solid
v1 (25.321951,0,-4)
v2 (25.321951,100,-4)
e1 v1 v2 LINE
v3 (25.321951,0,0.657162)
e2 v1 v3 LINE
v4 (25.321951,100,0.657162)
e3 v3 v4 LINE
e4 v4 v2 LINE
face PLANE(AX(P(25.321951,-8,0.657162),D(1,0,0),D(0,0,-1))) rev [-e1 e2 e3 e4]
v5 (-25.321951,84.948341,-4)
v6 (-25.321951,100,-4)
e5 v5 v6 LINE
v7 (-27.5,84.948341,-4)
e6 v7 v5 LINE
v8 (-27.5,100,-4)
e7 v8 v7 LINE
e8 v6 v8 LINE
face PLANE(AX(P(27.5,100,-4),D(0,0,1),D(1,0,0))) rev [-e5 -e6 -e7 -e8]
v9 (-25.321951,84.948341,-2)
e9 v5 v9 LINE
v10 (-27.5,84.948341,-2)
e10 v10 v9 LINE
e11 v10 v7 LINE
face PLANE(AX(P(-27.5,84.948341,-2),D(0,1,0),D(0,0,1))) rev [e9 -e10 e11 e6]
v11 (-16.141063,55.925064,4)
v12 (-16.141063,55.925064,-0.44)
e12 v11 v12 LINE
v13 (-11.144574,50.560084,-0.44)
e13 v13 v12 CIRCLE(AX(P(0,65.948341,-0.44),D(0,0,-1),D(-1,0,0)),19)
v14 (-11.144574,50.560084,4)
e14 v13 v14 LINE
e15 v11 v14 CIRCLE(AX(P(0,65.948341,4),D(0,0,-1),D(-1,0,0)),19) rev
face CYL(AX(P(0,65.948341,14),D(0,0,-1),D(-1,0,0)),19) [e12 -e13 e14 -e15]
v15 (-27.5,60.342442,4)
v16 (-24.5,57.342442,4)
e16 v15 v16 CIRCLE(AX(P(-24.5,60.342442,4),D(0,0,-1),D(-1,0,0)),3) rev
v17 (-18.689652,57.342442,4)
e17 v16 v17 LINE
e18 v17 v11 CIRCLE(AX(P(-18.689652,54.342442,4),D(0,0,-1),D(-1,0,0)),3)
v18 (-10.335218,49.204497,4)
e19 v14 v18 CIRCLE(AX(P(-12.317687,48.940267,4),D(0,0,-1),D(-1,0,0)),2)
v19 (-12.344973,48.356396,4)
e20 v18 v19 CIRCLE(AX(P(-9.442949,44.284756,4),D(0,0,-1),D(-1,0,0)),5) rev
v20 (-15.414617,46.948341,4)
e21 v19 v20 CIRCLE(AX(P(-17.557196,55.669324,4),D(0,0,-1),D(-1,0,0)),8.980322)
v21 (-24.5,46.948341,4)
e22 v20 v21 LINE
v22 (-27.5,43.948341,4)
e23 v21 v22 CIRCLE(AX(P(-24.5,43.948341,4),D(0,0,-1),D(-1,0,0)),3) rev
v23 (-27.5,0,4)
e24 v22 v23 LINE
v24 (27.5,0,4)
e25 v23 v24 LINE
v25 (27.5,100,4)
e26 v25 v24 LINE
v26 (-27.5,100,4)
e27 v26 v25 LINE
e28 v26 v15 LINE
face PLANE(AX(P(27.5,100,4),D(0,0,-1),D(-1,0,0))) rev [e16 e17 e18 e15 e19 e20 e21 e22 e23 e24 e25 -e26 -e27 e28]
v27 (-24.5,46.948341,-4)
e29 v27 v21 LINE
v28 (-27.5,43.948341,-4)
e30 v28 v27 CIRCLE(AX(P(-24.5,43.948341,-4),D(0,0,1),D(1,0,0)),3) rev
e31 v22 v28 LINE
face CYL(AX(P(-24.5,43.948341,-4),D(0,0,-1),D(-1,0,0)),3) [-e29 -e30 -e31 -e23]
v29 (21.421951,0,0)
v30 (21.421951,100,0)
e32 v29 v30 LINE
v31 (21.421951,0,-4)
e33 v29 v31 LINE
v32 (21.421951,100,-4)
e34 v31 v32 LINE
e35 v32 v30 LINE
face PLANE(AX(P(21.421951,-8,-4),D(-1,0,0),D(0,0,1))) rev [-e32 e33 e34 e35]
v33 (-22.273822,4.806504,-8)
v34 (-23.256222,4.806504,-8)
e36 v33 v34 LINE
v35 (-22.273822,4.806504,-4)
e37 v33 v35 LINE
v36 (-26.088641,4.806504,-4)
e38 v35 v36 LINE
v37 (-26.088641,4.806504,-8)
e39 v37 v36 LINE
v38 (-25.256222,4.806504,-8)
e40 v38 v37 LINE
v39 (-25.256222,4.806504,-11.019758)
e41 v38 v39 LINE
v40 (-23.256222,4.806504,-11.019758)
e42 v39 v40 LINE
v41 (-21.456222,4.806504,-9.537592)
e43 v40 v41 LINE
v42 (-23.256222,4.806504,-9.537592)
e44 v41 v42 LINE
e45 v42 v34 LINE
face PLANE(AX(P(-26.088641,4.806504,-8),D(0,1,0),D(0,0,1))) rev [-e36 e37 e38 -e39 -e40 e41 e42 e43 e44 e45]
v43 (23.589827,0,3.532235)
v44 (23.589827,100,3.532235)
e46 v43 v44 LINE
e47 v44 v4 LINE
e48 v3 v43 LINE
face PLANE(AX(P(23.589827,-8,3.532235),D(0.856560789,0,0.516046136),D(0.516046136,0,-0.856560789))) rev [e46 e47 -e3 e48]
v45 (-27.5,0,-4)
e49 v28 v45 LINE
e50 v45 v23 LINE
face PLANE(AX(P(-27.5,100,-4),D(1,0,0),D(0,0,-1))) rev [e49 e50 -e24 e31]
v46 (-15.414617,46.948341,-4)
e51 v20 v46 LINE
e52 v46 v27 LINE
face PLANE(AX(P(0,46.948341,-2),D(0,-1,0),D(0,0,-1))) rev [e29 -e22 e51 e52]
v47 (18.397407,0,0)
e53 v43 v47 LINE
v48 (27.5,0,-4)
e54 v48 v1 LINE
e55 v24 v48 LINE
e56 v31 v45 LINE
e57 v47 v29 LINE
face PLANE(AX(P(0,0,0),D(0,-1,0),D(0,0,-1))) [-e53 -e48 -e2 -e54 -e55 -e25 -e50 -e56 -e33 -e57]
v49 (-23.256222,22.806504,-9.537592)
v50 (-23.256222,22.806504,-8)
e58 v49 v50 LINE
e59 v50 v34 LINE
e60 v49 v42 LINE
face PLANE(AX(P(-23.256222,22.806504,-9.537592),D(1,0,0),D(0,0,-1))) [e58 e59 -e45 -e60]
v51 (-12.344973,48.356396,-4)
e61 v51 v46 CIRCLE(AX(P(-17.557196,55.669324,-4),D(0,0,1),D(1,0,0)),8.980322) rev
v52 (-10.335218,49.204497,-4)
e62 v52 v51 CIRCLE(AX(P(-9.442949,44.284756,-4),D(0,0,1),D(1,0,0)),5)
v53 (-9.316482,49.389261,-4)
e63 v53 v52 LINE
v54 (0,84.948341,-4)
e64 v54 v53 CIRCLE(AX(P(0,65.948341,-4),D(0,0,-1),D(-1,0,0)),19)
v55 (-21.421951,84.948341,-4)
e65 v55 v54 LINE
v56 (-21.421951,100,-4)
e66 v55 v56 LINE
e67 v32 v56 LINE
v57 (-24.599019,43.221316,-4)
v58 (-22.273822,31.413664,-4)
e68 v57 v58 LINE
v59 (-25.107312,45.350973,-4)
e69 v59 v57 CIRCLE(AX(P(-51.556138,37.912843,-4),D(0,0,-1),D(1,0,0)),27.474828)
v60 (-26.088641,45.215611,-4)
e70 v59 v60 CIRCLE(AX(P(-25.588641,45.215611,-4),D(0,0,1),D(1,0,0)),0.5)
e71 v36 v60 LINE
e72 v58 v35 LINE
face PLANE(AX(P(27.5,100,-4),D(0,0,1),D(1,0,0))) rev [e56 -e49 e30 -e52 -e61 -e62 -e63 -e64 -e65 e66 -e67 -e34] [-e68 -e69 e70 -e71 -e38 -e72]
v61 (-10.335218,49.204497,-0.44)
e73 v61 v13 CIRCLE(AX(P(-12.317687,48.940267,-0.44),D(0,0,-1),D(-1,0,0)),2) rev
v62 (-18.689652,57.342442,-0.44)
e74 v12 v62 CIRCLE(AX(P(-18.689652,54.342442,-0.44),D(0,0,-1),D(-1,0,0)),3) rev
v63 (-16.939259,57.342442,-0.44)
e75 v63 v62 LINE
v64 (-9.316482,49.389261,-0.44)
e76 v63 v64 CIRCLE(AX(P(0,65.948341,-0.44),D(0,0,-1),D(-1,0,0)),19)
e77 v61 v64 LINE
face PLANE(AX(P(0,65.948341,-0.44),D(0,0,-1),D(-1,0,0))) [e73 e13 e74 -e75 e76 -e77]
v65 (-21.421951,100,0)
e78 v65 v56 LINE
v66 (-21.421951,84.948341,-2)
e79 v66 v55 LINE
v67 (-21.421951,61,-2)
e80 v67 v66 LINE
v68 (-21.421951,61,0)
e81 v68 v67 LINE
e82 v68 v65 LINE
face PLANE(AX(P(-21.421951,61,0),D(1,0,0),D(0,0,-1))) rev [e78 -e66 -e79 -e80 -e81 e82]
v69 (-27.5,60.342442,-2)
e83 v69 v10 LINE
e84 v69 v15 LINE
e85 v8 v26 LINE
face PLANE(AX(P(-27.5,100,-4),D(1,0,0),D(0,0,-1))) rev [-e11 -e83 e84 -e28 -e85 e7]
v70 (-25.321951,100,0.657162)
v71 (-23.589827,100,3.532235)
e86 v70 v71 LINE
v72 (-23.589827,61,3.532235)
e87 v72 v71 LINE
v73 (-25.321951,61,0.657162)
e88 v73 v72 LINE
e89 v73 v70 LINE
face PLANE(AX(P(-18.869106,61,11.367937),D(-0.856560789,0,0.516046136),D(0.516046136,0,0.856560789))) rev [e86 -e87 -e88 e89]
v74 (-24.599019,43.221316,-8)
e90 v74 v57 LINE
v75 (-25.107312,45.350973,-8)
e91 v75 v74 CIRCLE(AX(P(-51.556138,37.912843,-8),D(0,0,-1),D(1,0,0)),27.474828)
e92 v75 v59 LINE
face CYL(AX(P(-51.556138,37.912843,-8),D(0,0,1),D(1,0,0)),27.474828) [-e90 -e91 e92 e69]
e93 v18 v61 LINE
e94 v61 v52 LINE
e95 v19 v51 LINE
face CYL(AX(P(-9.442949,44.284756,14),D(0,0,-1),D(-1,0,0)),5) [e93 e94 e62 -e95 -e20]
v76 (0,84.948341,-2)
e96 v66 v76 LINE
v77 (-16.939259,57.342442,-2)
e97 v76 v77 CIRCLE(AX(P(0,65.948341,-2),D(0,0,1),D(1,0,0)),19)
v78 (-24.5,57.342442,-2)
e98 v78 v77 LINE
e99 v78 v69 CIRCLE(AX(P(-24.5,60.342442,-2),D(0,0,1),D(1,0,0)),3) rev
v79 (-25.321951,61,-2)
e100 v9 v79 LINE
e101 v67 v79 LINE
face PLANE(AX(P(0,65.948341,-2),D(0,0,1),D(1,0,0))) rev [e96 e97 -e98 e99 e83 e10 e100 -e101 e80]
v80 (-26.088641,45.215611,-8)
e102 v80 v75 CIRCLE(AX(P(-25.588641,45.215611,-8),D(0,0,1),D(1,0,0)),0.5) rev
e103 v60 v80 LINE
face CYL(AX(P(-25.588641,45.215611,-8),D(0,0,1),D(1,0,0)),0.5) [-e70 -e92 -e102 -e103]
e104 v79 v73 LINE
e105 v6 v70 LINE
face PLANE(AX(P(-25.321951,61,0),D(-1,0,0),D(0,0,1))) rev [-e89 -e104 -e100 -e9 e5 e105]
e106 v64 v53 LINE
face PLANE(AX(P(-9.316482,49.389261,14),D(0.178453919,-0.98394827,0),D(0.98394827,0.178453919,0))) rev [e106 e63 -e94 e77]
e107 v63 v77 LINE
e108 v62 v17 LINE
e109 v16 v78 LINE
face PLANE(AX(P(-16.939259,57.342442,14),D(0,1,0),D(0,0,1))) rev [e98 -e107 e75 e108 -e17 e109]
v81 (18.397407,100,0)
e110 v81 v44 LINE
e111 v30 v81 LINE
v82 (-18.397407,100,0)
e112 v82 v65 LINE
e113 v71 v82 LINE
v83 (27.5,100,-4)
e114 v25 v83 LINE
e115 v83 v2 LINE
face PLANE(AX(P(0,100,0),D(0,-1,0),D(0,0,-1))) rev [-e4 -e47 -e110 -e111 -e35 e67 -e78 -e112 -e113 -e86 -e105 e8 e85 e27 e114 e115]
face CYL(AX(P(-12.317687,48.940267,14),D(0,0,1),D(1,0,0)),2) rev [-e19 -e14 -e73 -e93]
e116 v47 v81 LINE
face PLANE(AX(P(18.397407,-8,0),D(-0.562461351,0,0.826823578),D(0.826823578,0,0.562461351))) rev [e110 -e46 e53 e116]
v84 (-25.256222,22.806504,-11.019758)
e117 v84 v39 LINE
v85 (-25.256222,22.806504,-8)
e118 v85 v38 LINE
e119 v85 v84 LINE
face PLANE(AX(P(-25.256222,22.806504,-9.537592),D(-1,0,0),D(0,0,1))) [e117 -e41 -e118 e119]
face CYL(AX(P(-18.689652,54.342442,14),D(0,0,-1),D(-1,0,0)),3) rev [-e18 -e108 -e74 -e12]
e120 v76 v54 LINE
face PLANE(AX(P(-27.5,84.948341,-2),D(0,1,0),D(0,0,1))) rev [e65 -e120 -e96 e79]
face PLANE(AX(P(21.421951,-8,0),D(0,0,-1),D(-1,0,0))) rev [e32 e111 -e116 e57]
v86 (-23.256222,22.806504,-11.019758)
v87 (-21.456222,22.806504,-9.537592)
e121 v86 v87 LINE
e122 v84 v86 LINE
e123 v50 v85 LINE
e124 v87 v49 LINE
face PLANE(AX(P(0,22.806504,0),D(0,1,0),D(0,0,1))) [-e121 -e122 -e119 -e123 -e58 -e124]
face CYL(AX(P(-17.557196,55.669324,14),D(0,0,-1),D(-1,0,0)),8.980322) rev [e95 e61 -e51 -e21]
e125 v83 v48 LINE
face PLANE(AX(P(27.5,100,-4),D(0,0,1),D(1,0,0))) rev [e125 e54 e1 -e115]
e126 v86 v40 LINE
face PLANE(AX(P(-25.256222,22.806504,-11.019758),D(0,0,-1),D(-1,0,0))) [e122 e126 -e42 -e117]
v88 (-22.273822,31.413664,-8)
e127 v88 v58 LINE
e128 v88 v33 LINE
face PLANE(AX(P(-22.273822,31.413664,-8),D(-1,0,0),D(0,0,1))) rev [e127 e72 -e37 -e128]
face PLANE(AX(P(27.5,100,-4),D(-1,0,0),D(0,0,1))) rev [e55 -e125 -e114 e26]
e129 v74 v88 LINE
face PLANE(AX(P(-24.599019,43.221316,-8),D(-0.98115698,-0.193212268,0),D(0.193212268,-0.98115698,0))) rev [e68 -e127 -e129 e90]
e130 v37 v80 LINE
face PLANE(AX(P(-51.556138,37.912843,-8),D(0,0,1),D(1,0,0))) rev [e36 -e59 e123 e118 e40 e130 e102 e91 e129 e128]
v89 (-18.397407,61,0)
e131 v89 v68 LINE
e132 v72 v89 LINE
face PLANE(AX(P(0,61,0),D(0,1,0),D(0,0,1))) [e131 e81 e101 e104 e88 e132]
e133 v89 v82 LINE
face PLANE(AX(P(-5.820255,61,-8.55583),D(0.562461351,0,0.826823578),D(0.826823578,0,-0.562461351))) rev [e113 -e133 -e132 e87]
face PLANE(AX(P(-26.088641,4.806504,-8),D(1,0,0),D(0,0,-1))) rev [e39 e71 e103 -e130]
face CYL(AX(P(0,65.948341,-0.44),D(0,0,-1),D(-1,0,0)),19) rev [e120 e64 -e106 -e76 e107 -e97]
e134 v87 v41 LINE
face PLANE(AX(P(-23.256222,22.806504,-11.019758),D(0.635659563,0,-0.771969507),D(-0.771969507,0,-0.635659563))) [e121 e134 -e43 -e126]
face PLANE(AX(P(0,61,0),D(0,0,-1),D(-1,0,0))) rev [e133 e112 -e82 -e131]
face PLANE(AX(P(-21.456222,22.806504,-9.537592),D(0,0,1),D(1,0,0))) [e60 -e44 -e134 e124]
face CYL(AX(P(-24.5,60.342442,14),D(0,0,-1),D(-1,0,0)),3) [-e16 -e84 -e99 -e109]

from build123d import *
from build123d.topology import SkipClean

# Parameters (mm, degrees)
SKETCH1_W           = 55
SKETCH1_H           = 8
BOSS_EXTRUDE1_DEPTH = 100
SKETCH4_R           = 19
CUT_EXTRUDE3_DEPTH  = 3.56
CUT_EXTRUDE4_DEPTH  = 2
CUT_EXTRUDE5_DEPTH  = 16
BOSS_EXTRUDE2_START = 2
BOSS_EXTRUDE2_DEPTH = 2
FILLET1_R           = 3
FILLET2_R           = 3
FILLET3_R           = 3
FILLET4_R           = 2
BOSS_EXTRUDE3_DEPTH = 4
CUT_EXTRUDE9_DEPTH  = 39
CUT_EXTRUDE13_DEPTH = 108
BOSS_EXTRUDE4_DEPTH = 18
FILLET5_R           = 0.5


with BuildPart() as part:
    # Sketch1 → Boss-Extrude1 (new body)
    with BuildSketch(Plane(origin=(0, 0, 0), x_dir=(1, 0, 0), z_dir=(0, 1, 0))):
        Rectangle(SKETCH1_W, SKETCH1_H)
    extrude(amount=BOSS_EXTRUDE1_DEPTH)

    # Sketch4 → Cut-Extrude3 (cut)
    with BuildSketch(Plane(origin=(0, 0, -4), x_dir=(-1, 0, 0), z_dir=(0, 0, -1))):
        with Locations((0, 65.948341349)):
            Circle(SKETCH4_R)
    extrude(amount=-CUT_EXTRUDE3_DEPTH, mode=Mode.SUBTRACT)

    # Sketch5 → Cut-Extrude4 (cut)
    with BuildSketch(Plane(origin=(0, 0, -4), x_dir=(-1, 0, 0), z_dir=(0, 0, -1))):
        with BuildLine():
            Line((0, 46.948341349), (27.5, 46.948341349))
            Line((27.5, 46.948341349), (27.5, 84.948341349))
            Line((27.5, 84.948341349), (0, 84.948341349))
            ThreePointArc((0, 84.948341349), (19, 65.948341349), (0, 46.948341349))
        make_face()
    extrude(amount=-CUT_EXTRUDE4_DEPTH, mode=Mode.SUBTRACT)

    # Sketch6 → Cut-Extrude5 (cut)
    with BuildSketch(Plane(origin=(0, 0, -2), x_dir=(-1, 0, 0), z_dir=(0, 0, -1))):
        with BuildLine():
            Line((15.414617012, 46.948341349), (27.5, 46.948341349))
            Line((27.5, 46.948341349), (27.5, 57.34244177))
            Line((27.5, 57.34244177), (16.93925891, 57.34244177))
            ThreePointArc((16.93925891, 57.34244177), (13.716933305, 52.801260277), (9.316482273, 49.389260515))
            add(Edge.make_bspline(
                [(9.316482273, 49.389260515), (9.656060905, 49.327672788), (9.995639536, 49.266085061), (10.335218168, 49.204497334)],
                knots=[0, 0, 0, 0, 0.453327557, 0.453327557, 0.453327557, 0.453327557], degree=3))
            ThreePointArc((10.335218168, 49.204497334), (11.386910009, 48.891383158), (12.344973185, 48.356396089))
            ThreePointArc((12.344973185, 48.356396089), (13.813009587, 47.506772296), (15.414617012, 46.948341349))
        make_face()
    extrude(amount=-CUT_EXTRUDE5_DEPTH, mode=Mode.SUBTRACT)

    # Sketch7 → Boss-Extrude2 (add)
    with BuildSketch(Plane(origin=(0, 0, -2), x_dir=(-1, 0, 0), z_dir=(0, 0, -1)).offset(BOSS_EXTRUDE2_START)):
        with BuildLine():
            Line((0, 46.948341349), (15.414617012, 46.948341349))
            ThreePointArc((15.414617012, 46.948341349), (13.813009587, 47.506772296), (12.344973185, 48.356396089))
            ThreePointArc((12.344973185, 48.356396089), (11.386910009, 48.891383158), (10.335218168, 49.204497334))
            Line((10.335218168, 49.204497334), (9.316482273, 49.389260515))
            ThreePointArc((9.316482273, 49.389260515), (4.815468002, 47.568698591), (0, 46.948341349))
        make_face()
    extrude(amount=-BOSS_EXTRUDE2_DEPTH)

    # Fillet1
    fillet1_edges = [part.edges().sort_by_distance(p)[0] for p in [
        (-27.5, 46.948341349, 0),
    ]]
    fillet(fillet1_edges, radius=FILLET1_R)

    # Fillet2
    fillet2_edges = [part.edges().sort_by_distance(p)[0] for p in [
        (-27.5, 57.34244177, 1),
    ]]
    fillet(fillet2_edges, radius=FILLET2_R)

    # Fillet3
    fillet3_edges = [part.edges().sort_by_distance(p)[0] for p in [
        (-16.93925891, 57.34244177, 1.78),
    ]]
    fillet(fillet3_edges, radius=FILLET3_R)

    # Fillet4
    # the kernel refuses this fillet: 2 mm, written as the material it adds along each edge
    with BuildSketch(Plane(origin=(-9.316482273, 49.389260515, -0.44), x_dir=(-0.8420947177301665, 0.5393296639078471, 0), z_dir=(0, 0, 1))) as fillet4_piece_1:
        with BuildLine():
            CenterArc((2.285143138, 1.996733658), FILLET4_R, 220.22985095, 46.495139538)
            Line((0.758223851, 0.705022587), (0, 0))
            ThreePointArc((0, 0), (1.08544299, 0.031030246), (2.170885981, 0))
        make_face()
    extrude(amount=4.44)

    # Sketch8 → Boss-Extrude3 (add)
    with SkipClean():  # the faces are left unmerged after this step: merging them gives an invalid solid
        with BuildSketch(Plane(origin=(0, 0, -4), x_dir=(-1, 0, 0), z_dir=(0, 0, -1))):
            with BuildLine():
                Line((26.088640722, 4.806504153), (22.273821869, 4.806504153))
                Line((22.273821869, 4.806504153), (22.273821869, 31.413664101))
                Line((22.273821869, 31.413664101), (24.599018881, 43.221316386))
                ThreePointArc((24.599018881, 43.221316386), (25.224862201, 45.756953754), (26.088640722, 48.221710007))
                Line((26.088640722, 48.221710007), (26.088640722, 4.806504153))
            make_face()
        extrude(amount=BOSS_EXTRUDE3_DEPTH)

    # Sketch10 → Cut-Extrude9 (cut)
    with SkipClean():  # the faces are left unmerged after this step: merging them gives an invalid solid
        with BuildSketch(Plane(origin=(0, 100, 0), x_dir=(1, 0, 0), z_dir=(0, 1, 0))):
            Polygon((-21.421951451, 4), (-25.321951451, 4), (-25.321951451, -0.657162479), (-23.589826686, -3.532235176), (-18.397407116, 0), (-21.421951451, 0), align=None)
        extrude(amount=-CUT_EXTRUDE9_DEPTH, mode=Mode.SUBTRACT)

    # Sketch11 → Cut-Extrude13 (cut)
    with SkipClean():  # the faces are left unmerged after this step: merging them gives an invalid solid
        with BuildSketch(Plane(origin=(0, 100, 0), x_dir=(1, 0, 0), z_dir=(0, 1, 0))):
            Polygon((21.421951451, 4), (25.321951451, 4), (25.321951451, -0.657162479), (23.589826686, -3.532235176), (18.397407116, 0), (21.421951451, 0), align=None)
        extrude(amount=-CUT_EXTRUDE13_DEPTH, mode=Mode.SUBTRACT)

    # Sketch12 → Boss-Extrude4 (add)
    with SkipClean():  # the faces are left unmerged after this step: merging them gives an invalid solid
        with BuildSketch(Plane.XZ.offset(-4.806504153)):
            Polygon((-23.25622165, -11.019758414), (-21.45622165, -9.537592081), (-23.25622165, -9.537592081), (-23.25622165, -8), (-25.25622165, -8), (-25.25622165, -9.537592081), (-25.25622165, -11.019758414), align=None)
        extrude(amount=-BOSS_EXTRUDE4_DEPTH)

    # Fillet5
    # the kernel refuses this fillet: 0.5 mm, written as the material it takes off along each edge
    with BuildSketch(Plane(origin=(-26.088640722, 48.221710007, -4), x_dir=(0, -1, 0), z_dir=(0, 0, -1))) as fillet5_piece_1:
        with BuildLine():
            CenterArc((3.006099278, -0.5), FILLET5_R, 90, 164.292569468)
            ThreePointArc((2.870736632, -0.981328322), (1.421812921, -0.530318544), (0, 0))
            Line((0, 0), (3.006099278, 0))
        make_face()
    extrude(amount=11.584578962, mode=Mode.SUBTRACT)


solid = part.part
